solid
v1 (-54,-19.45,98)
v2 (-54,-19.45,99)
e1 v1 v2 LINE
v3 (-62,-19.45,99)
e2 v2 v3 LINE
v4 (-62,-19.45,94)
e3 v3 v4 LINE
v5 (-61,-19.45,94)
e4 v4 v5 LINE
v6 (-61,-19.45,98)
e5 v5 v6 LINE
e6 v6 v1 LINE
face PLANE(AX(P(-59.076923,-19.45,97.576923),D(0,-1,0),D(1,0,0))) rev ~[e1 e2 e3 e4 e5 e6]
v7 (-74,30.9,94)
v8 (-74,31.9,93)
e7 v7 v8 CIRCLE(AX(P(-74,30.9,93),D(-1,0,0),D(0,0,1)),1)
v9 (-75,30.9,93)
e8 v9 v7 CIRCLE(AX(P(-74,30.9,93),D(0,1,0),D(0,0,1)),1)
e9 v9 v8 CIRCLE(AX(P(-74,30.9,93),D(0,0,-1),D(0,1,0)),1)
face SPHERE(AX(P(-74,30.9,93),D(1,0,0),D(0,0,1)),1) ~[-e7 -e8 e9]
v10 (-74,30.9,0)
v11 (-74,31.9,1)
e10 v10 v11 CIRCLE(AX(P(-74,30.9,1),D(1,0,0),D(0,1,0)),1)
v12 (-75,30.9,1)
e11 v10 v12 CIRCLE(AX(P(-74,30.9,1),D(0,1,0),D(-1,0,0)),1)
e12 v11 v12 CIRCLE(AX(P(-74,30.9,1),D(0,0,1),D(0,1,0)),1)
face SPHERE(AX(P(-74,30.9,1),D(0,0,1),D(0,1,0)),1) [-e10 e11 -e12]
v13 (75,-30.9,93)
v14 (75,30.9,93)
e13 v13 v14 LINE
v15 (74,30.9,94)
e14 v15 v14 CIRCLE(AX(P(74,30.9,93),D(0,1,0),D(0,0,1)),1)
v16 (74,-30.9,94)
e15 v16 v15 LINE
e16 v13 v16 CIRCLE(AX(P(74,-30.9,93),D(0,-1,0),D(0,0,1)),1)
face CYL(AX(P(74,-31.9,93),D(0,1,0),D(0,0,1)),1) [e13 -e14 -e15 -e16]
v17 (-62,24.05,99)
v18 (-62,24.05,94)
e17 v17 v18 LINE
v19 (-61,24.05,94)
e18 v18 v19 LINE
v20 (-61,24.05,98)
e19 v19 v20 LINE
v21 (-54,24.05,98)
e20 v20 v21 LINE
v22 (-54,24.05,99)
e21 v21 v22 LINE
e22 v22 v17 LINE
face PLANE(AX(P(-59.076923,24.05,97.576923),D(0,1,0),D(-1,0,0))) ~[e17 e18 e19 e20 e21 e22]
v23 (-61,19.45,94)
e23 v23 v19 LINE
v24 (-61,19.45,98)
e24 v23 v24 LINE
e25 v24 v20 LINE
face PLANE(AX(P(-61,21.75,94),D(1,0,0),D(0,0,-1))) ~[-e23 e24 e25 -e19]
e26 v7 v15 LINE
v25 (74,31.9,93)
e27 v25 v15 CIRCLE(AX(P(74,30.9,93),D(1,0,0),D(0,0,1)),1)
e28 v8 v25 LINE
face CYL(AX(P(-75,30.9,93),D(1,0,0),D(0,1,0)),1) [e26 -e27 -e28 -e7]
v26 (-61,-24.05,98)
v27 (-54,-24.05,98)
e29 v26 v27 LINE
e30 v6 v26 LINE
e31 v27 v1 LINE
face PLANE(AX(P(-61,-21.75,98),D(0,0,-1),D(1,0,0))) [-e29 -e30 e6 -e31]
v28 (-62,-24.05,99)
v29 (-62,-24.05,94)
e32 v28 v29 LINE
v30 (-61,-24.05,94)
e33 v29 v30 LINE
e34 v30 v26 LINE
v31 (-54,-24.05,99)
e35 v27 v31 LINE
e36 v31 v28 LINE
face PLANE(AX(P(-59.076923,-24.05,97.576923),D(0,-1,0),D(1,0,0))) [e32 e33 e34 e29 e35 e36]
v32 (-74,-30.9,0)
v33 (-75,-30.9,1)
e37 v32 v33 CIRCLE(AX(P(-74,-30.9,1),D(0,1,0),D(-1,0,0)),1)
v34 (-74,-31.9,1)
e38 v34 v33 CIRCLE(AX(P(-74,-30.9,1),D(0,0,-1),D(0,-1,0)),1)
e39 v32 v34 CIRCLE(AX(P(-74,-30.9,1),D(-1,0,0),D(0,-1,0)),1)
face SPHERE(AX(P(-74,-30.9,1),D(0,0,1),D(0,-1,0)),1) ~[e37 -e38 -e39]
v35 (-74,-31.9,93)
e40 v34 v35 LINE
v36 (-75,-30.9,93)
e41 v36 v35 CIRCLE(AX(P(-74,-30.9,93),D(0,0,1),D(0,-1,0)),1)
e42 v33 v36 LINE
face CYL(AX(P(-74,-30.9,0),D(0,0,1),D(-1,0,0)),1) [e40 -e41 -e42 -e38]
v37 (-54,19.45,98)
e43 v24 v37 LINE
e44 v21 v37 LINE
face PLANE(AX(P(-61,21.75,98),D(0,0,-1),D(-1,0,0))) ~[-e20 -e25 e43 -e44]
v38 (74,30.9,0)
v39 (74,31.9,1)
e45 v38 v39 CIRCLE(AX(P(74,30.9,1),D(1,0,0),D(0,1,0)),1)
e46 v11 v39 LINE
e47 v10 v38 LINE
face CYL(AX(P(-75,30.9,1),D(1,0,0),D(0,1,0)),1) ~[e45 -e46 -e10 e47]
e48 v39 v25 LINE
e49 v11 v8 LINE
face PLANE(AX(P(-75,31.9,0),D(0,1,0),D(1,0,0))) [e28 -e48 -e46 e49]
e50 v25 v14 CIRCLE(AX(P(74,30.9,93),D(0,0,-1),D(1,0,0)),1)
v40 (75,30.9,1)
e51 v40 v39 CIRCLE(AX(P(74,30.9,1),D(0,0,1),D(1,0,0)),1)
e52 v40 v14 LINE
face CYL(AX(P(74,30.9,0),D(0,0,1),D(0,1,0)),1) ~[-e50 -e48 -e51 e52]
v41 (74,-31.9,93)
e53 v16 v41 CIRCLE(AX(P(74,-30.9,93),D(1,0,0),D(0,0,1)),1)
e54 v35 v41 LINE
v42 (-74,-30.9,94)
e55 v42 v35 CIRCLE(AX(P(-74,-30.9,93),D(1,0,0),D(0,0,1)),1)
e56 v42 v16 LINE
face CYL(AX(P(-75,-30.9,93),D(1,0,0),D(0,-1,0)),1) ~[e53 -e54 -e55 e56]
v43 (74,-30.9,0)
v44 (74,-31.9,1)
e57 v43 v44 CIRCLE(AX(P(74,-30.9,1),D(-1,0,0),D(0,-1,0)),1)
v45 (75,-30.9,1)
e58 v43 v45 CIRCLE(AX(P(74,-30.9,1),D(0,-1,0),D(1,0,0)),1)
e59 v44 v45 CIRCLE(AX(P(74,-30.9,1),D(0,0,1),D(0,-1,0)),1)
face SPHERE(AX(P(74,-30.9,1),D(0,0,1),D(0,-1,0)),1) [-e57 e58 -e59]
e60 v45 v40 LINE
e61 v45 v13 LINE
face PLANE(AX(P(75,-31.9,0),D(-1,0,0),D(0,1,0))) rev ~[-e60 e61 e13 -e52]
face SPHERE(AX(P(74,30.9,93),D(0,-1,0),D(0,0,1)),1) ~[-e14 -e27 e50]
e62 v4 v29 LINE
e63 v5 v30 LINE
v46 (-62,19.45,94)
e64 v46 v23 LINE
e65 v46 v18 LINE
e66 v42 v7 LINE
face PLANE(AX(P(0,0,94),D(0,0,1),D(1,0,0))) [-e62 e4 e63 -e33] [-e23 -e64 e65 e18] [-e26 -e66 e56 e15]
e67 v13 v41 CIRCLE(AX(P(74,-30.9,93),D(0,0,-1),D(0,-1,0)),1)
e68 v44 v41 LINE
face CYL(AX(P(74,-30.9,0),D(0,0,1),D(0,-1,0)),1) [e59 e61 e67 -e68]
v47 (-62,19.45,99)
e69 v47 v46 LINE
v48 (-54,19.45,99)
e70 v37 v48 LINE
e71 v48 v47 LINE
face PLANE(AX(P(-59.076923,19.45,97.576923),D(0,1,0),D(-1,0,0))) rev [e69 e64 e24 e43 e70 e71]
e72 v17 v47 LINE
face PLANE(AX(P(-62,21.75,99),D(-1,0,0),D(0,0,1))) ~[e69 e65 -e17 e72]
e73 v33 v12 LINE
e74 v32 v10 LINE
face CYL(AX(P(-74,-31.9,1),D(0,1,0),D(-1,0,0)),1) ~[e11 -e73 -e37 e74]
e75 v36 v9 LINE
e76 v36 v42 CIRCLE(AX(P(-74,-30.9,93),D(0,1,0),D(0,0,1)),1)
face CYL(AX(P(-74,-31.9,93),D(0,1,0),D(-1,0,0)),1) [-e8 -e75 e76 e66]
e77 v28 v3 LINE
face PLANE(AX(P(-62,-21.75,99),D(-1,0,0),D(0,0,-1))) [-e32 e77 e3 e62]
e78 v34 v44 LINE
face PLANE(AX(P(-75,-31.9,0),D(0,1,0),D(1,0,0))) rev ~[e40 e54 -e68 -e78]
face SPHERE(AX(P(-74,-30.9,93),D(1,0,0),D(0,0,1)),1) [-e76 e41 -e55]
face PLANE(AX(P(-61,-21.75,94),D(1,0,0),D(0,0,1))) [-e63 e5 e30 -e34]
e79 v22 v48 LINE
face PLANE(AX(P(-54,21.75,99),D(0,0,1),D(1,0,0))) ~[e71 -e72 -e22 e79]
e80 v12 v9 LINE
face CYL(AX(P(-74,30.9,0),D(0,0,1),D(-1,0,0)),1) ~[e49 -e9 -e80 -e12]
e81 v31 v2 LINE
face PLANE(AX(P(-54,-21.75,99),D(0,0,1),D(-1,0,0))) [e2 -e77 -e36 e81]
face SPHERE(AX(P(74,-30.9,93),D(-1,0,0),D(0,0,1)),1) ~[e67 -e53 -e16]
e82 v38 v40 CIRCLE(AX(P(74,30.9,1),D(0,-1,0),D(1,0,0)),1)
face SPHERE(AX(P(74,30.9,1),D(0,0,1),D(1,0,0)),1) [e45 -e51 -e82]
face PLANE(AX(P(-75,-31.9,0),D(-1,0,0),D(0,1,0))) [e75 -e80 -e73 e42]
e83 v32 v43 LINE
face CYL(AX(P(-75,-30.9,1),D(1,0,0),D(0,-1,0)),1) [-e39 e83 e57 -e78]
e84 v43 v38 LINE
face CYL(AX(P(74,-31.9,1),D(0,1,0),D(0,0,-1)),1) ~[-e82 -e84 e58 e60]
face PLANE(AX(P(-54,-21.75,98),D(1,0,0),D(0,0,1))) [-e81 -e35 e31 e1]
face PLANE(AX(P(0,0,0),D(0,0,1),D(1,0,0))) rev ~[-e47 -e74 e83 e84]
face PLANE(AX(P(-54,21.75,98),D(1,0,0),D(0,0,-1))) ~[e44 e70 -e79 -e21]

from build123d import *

# Parameters (mm, degrees)
F0_W     = 150
F0_H     = 63.8
F1_DEPTH = 94
F4_DEPTH = 2.3
F5_R     = 1


# Not quite as in the source:
# - a pattern or mirror of a feature is missing from the dataset's text; its kind, count and spacing are read off the source's solid


with BuildPart() as f1:
    # F0 (on Top) → F1 (new body)
    with BuildSketch(Plane.XY):
        Rectangle(F0_W, F0_H)
    extrude(amount=F1_DEPTH)

    # F3 (on offset) → F4 (join, symmetric)
    with BuildSketch(Plane.XZ.offset(21.75)):
        Polygon((-62, 99), (-62, 94), (-61, 94), (-61, 98), (-54, 98), (-54, 99), align=None)
    f4 = extrude(amount=F4_DEPTH, both=True)

    # F4_copies: F4 across plane
    add(f4.mirror(Plane.ZX))

    # F5
    f5_edges = [f1.edges().sort_by_distance(p)[0] for p in [
        (0, -31.9, 94),
        (75, 0, 94),
        (0, 31.9, 94),
        (-75, 0, 94),
        (-75, -31.9, 47),
        (75, -31.9, 47),
        (0, -31.9, 0),
        (75, 31.9, 47),
        (75, 0, 0),
        (-75, 31.9, 47),
        (0, 31.9, 0),
        (-75, 0, 0),
    ]]
    fillet(f5_edges, radius=F5_R)


solid = f1.part
